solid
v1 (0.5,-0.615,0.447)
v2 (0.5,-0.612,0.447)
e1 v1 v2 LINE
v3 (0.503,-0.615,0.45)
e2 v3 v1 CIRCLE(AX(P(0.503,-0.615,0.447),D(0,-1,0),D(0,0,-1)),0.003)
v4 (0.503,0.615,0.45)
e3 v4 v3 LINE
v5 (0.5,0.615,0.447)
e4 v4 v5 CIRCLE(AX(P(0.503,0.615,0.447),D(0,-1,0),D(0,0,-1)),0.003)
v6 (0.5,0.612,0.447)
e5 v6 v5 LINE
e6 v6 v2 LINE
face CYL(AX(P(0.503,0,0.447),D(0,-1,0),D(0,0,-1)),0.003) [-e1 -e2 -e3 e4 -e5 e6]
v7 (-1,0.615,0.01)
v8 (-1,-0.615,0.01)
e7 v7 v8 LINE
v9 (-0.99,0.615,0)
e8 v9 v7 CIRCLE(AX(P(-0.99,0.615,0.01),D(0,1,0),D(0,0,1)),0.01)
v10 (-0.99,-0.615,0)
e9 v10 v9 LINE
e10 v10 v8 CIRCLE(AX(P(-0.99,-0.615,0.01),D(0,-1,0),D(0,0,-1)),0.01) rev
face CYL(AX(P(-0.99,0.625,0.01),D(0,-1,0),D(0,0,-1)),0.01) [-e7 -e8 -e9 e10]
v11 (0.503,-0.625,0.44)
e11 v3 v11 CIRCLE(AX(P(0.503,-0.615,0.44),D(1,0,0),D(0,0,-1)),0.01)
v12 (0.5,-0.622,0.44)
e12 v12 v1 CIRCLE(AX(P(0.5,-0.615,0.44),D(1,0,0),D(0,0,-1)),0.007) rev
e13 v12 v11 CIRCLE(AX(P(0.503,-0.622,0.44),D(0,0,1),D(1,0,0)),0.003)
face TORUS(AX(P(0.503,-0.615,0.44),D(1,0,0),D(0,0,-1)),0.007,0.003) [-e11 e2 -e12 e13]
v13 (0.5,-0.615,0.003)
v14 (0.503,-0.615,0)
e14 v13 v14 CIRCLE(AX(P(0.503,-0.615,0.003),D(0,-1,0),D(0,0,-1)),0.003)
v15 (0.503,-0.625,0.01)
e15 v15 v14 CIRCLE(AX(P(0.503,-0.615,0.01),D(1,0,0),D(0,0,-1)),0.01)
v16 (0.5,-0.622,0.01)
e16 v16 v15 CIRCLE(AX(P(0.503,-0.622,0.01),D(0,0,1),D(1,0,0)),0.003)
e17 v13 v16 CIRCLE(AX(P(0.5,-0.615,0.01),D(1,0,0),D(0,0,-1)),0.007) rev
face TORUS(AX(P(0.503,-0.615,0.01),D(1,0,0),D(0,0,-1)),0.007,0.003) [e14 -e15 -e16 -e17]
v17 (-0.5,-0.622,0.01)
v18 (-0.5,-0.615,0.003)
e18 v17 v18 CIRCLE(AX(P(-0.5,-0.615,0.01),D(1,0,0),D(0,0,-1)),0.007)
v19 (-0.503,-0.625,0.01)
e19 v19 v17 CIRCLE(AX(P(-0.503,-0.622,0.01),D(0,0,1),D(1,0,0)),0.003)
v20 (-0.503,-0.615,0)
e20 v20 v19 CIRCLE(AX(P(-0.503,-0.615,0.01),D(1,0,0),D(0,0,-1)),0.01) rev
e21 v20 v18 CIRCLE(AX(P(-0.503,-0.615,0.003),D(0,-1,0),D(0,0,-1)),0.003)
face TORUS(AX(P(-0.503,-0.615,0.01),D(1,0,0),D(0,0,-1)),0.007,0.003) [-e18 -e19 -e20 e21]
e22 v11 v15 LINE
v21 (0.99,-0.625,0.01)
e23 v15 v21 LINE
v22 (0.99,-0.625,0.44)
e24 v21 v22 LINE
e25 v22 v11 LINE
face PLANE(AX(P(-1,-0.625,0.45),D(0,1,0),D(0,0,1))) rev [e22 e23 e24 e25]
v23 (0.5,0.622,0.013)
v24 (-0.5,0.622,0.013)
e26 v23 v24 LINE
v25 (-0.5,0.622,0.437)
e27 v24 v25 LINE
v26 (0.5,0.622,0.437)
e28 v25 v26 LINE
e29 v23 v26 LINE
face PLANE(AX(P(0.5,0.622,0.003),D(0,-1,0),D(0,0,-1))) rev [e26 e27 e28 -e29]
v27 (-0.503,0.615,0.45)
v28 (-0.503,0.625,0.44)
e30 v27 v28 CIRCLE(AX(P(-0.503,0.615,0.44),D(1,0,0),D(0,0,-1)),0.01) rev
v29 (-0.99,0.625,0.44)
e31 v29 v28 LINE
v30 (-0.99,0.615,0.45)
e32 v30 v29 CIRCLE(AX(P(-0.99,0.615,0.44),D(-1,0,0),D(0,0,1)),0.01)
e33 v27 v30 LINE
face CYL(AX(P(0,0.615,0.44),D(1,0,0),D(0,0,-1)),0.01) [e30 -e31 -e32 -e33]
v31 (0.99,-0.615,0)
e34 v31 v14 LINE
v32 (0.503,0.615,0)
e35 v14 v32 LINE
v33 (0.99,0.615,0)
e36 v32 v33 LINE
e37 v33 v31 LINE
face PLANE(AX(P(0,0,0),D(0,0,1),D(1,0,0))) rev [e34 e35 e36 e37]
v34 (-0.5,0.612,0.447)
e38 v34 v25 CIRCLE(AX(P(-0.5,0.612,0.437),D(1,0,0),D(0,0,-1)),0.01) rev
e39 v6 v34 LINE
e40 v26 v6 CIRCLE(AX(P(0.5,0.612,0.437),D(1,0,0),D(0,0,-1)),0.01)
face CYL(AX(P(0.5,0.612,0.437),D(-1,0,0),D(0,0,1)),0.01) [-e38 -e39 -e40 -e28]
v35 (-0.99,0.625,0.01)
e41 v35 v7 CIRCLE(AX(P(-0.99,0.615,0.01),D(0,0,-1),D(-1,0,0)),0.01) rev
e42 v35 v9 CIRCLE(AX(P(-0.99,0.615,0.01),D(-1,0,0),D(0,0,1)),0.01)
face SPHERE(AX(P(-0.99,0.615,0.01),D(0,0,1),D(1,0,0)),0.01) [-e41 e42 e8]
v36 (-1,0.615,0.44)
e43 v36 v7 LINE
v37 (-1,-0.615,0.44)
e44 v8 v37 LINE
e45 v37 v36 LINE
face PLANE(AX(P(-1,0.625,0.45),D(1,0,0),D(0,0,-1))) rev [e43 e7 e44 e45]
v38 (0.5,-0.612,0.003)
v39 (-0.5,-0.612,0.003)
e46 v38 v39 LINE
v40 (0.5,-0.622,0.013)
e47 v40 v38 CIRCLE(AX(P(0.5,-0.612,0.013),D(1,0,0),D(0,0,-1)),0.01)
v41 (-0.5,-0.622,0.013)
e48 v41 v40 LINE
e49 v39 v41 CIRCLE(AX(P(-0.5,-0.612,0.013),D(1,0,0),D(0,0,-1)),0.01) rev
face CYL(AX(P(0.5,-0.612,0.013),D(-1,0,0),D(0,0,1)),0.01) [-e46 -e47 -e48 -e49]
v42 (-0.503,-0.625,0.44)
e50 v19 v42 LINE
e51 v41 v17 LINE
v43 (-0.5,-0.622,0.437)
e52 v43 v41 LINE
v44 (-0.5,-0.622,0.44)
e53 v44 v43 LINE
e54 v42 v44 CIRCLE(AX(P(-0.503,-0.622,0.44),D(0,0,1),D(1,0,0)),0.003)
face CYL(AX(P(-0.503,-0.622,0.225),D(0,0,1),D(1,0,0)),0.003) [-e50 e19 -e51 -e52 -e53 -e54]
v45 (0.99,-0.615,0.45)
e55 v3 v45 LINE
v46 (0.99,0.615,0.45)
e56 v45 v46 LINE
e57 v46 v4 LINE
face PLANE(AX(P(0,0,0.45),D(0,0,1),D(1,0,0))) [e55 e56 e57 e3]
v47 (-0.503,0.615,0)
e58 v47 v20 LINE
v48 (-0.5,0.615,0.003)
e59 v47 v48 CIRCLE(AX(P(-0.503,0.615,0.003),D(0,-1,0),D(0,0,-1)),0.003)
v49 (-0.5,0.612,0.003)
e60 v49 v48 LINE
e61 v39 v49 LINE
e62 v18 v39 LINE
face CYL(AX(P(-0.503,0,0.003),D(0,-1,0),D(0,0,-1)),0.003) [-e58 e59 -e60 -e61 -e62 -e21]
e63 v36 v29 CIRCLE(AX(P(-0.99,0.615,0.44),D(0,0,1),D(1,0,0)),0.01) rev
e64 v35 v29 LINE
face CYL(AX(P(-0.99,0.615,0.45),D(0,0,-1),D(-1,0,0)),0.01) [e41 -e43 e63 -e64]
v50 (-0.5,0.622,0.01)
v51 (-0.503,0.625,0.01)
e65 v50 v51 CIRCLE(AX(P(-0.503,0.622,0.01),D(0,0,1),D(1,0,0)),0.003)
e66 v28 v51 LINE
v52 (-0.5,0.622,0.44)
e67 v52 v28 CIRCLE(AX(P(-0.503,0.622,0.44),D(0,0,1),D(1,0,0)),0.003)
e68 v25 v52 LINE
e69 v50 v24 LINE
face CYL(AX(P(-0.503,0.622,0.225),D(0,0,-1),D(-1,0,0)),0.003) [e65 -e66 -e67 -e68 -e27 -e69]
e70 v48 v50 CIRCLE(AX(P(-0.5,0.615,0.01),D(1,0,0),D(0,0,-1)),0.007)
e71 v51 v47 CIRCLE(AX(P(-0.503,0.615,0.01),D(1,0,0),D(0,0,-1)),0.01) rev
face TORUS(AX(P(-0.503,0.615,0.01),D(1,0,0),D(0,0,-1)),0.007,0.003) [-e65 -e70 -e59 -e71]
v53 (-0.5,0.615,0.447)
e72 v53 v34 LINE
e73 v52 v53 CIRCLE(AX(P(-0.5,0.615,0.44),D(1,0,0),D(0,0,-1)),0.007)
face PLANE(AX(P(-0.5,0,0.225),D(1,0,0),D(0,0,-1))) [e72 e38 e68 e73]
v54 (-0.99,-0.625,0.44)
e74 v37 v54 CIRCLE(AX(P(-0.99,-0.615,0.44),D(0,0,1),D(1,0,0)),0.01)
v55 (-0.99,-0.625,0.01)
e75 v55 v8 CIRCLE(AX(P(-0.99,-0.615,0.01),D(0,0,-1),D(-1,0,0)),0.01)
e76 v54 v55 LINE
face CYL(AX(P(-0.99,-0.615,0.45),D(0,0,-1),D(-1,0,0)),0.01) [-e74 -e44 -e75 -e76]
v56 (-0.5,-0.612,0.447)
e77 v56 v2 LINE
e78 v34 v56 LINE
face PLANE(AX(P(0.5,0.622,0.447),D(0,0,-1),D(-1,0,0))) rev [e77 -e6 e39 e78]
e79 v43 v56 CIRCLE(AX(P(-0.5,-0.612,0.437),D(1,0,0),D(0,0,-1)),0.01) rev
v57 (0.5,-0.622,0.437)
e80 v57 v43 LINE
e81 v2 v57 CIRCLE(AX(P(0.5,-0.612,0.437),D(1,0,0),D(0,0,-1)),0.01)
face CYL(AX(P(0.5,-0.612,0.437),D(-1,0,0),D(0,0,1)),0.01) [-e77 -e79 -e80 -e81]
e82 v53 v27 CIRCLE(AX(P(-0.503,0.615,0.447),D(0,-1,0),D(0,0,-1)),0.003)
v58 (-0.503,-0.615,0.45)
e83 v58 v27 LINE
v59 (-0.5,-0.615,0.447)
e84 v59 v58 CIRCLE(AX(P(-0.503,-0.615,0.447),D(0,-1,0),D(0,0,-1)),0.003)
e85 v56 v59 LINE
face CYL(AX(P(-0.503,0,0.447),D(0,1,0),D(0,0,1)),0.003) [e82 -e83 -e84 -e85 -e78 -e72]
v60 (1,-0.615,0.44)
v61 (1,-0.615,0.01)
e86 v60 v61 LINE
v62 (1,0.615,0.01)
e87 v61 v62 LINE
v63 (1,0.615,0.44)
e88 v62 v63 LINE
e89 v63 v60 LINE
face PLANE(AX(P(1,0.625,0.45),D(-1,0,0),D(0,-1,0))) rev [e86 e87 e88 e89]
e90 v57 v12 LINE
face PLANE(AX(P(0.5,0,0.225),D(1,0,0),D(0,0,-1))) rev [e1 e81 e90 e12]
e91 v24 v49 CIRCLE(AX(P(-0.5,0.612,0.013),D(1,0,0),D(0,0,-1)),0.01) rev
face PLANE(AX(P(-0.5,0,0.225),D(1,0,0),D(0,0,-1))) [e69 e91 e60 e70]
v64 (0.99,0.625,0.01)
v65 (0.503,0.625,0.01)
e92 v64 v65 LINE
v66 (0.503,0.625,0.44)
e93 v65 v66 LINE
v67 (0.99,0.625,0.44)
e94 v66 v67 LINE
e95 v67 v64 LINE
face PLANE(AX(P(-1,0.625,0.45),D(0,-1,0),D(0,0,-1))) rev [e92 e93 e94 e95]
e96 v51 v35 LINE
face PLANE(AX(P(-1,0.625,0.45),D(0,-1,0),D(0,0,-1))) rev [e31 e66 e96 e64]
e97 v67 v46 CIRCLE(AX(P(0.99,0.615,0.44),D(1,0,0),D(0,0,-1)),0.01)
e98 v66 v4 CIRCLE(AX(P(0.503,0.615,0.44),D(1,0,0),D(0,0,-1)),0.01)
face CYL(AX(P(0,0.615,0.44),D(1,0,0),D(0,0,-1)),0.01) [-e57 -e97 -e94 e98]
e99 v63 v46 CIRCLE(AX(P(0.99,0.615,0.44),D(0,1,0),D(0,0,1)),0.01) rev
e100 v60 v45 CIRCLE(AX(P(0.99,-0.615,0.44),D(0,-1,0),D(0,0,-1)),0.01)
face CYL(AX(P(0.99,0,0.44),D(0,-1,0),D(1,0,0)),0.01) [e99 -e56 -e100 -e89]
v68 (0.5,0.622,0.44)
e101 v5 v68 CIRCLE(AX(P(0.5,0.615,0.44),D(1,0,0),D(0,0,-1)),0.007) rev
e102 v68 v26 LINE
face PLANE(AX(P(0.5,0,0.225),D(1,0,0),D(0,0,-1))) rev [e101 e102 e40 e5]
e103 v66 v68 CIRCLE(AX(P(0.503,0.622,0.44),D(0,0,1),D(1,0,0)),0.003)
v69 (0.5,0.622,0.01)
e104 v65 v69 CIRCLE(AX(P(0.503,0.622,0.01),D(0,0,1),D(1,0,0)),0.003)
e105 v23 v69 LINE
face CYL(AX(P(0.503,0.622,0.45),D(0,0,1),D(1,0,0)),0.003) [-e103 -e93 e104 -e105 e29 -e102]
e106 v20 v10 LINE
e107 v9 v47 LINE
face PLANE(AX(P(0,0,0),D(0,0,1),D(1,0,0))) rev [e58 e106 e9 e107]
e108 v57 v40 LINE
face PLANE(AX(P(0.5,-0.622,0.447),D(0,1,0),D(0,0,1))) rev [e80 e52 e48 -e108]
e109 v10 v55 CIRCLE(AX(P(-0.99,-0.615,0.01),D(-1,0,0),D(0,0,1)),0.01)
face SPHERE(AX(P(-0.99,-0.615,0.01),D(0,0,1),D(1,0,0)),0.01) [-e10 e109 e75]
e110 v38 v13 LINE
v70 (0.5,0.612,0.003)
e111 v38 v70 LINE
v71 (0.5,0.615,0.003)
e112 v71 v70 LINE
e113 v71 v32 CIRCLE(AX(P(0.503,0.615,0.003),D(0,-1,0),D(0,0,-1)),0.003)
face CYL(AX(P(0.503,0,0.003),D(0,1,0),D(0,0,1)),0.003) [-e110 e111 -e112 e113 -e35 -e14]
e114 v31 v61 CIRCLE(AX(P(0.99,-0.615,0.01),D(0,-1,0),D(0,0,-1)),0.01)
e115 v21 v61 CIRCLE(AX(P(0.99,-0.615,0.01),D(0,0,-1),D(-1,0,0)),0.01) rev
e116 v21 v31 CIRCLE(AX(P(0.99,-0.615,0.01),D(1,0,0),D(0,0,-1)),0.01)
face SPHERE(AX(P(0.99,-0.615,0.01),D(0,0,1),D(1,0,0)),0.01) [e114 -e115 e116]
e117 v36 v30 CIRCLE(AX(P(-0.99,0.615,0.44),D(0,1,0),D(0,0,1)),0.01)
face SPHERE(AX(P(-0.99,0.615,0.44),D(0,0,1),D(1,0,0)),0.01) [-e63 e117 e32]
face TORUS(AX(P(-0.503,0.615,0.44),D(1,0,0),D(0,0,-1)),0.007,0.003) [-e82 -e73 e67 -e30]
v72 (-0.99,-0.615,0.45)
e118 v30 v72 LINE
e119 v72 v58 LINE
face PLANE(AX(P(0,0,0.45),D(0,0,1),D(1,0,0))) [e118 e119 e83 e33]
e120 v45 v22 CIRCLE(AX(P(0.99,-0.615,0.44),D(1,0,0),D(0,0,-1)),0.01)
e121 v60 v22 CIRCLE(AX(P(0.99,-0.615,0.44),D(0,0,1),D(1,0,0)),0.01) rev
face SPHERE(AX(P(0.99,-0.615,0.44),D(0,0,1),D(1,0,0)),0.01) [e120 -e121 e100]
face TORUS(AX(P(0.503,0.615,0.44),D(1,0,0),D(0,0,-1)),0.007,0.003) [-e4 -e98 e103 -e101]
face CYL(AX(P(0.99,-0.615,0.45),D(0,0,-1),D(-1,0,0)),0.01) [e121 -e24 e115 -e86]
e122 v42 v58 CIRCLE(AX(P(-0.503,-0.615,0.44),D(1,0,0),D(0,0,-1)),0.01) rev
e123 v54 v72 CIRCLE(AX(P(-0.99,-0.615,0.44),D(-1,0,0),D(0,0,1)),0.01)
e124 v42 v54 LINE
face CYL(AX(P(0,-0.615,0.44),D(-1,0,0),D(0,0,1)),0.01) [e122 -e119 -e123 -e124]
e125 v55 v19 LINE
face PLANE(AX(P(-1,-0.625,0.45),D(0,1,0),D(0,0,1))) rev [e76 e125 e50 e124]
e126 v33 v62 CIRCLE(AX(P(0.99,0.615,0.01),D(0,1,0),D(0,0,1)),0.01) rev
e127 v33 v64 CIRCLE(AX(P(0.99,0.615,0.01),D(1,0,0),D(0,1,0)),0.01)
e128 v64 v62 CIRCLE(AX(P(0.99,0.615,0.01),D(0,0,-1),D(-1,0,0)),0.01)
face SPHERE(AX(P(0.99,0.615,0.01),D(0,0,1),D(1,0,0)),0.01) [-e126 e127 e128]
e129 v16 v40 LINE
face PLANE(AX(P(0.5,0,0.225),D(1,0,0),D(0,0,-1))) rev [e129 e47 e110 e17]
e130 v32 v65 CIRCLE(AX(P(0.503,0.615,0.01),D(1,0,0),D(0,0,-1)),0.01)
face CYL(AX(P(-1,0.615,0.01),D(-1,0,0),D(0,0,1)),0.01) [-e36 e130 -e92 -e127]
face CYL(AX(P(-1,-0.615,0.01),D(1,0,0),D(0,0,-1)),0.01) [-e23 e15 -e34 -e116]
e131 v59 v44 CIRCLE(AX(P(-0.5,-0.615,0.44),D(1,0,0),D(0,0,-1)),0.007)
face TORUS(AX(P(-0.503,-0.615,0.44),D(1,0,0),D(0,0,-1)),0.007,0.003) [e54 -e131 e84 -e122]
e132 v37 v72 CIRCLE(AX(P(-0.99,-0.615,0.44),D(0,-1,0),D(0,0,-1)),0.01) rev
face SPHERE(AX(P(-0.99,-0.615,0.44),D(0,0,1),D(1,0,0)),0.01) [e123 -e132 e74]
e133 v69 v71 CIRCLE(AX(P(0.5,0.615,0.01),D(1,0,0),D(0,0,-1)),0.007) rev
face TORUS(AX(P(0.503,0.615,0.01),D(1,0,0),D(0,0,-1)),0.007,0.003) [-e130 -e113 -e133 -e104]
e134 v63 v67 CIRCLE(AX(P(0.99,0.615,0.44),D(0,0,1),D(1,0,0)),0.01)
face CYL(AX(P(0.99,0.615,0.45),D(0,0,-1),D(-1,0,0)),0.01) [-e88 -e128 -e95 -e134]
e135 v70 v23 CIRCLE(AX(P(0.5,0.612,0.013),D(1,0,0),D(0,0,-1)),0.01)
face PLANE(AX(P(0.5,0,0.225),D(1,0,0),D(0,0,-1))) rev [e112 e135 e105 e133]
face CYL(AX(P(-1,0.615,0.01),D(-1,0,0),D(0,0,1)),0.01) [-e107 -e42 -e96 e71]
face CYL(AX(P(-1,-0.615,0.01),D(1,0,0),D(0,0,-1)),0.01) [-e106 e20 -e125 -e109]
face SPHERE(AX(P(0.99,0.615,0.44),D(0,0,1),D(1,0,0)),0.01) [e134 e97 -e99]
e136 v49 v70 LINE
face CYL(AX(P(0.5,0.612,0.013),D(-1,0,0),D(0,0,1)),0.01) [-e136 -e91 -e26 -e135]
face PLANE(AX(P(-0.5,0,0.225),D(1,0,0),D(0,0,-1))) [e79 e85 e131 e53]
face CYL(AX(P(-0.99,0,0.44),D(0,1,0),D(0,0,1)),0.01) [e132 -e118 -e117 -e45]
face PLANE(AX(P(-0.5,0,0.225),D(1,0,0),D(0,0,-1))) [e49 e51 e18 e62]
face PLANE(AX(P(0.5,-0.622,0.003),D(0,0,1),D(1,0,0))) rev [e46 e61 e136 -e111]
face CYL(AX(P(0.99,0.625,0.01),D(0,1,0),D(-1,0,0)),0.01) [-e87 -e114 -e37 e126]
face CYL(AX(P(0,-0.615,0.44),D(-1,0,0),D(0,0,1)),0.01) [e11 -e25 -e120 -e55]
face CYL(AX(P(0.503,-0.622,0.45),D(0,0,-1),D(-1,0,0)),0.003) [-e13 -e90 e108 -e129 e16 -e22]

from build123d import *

# Parameters (mm, degrees)
SKETCH1_W                           = 2
SKETCH1_H                           = 1.25
ALL_BODY_DEPTH                      = 0.45
CUT_OUT_THE_BODY_FOR_PIN_DEPTH      = 0.5
CUT_OUT_THE_BODY_FOR_PIN_DEPTH_BACK = 0.5
SKETCH2_OUTSIDE_W                   = 2.93
SKETCH2_OUTSIDE_H                   = 3.73
SKETCH2_OUTSIDE_W_2                 = 0.444
SKETCH2_OUTSIDE_H_2                 = 1.244
BODY_FILLET_R                       = 0.01
PIN_FILLET_A_R                      = 0.01
PIN_FILLET_B_R                      = 0.003


with BuildPart() as part:
    # Sketch1 → All body (new body)
    with BuildSketch(Plane.XY):
        Rectangle(SKETCH1_W, SKETCH1_H)
    extrude(amount=ALL_BODY_DEPTH)

    # Sketch2 outside → Cut out the body for pin (cut, two sides: drawn at the far end of the back side and taken through both)
    with BuildSketch(Plane(origin=(0, 0, 0), x_dir=(0, 0, -1), z_dir=(1, 0, 0)).offset(-CUT_OUT_THE_BODY_FOR_PIN_DEPTH_BACK)):
        with Locations((-0.225, 0)):
            Rectangle(SKETCH2_OUTSIDE_W, SKETCH2_OUTSIDE_H)
        with Locations((-0.225, 0)):
            Rectangle(SKETCH2_OUTSIDE_W_2, SKETCH2_OUTSIDE_H_2, mode=Mode.SUBTRACT)
    extrude(amount=CUT_OUT_THE_BODY_FOR_PIN_DEPTH + CUT_OUT_THE_BODY_FOR_PIN_DEPTH_BACK, mode=Mode.SUBTRACT)

    # Body fillet
    body_fillet_edges = [part.edges().sort_by_distance(p)[0] for p in [
        (0, 0.622, 0.003),
        (0, 0.622, 0.447),
        (0, -0.622, 0.447),
        (0, -0.622, 0.003),
    ]]
    fillet(body_fillet_edges, radius=BODY_FILLET_R)

    # Pin fillet a
    pin_fillet_a_edges = [part.edges().sort_by_distance(p)[0] for p in [
        (1, 0, 0.45),
        (-0.75, 0.625, 0),
        (0.75, -0.625, 0),
        (0.75, -0.625, 0.45),
        (-0.75, 0.625, 0.45),
        (0.75, 0.625, 0.45),
        (-1, 0, 0.45),
        (0.75, 0.625, 0),
        (1, 0, 0),
        (-0.75, -0.625, 0),
        (-1, 0, 0),
        (-1, 0.625, 0.225),
        (1, 0.625, 0.225),
        (1, -0.625, 0.225),
        (-1, -0.625, 0.225),
        (-0.75, -0.625, 0.45),
    ]]
    fillet(pin_fillet_a_edges, radius=PIN_FILLET_A_R)

    # Pin fillet b
    pin_fillet_b_edges = [part.edges().sort_by_distance(p)[0] for p in [
        (0.5, -0.625, 0.225),
        (0.5, 0, 0.45),
        (0.5, 0.625, 0.225),
        (0.5, 0, 0),
        (-0.5, 0.625, 0.225),
        (-0.5, 0, 0.45),
        (-0.5, -0.625, 0.225),
        (-0.5, 0, 0),
        (0.5, 0.622071068, 0.002928932),
        (0.5, -0.622071068, 0.002928932),
        (0.5, -0.622071068, 0.447071068),
        (0.5, 0.622071068, 0.447071068),
        (-0.5, -0.622071068, 0.447071068),
        (-0.5, 0.622071068, 0.447071068),
        (-0.5, -0.622071068, 0.002928932),
        (-0.5, 0.622071068, 0.002928932),
    ]]
    fillet(pin_fillet_b_edges, radius=PIN_FILLET_B_R - 0.0001)  # a hair under: the kernel refuses the full size


solid = part.part
